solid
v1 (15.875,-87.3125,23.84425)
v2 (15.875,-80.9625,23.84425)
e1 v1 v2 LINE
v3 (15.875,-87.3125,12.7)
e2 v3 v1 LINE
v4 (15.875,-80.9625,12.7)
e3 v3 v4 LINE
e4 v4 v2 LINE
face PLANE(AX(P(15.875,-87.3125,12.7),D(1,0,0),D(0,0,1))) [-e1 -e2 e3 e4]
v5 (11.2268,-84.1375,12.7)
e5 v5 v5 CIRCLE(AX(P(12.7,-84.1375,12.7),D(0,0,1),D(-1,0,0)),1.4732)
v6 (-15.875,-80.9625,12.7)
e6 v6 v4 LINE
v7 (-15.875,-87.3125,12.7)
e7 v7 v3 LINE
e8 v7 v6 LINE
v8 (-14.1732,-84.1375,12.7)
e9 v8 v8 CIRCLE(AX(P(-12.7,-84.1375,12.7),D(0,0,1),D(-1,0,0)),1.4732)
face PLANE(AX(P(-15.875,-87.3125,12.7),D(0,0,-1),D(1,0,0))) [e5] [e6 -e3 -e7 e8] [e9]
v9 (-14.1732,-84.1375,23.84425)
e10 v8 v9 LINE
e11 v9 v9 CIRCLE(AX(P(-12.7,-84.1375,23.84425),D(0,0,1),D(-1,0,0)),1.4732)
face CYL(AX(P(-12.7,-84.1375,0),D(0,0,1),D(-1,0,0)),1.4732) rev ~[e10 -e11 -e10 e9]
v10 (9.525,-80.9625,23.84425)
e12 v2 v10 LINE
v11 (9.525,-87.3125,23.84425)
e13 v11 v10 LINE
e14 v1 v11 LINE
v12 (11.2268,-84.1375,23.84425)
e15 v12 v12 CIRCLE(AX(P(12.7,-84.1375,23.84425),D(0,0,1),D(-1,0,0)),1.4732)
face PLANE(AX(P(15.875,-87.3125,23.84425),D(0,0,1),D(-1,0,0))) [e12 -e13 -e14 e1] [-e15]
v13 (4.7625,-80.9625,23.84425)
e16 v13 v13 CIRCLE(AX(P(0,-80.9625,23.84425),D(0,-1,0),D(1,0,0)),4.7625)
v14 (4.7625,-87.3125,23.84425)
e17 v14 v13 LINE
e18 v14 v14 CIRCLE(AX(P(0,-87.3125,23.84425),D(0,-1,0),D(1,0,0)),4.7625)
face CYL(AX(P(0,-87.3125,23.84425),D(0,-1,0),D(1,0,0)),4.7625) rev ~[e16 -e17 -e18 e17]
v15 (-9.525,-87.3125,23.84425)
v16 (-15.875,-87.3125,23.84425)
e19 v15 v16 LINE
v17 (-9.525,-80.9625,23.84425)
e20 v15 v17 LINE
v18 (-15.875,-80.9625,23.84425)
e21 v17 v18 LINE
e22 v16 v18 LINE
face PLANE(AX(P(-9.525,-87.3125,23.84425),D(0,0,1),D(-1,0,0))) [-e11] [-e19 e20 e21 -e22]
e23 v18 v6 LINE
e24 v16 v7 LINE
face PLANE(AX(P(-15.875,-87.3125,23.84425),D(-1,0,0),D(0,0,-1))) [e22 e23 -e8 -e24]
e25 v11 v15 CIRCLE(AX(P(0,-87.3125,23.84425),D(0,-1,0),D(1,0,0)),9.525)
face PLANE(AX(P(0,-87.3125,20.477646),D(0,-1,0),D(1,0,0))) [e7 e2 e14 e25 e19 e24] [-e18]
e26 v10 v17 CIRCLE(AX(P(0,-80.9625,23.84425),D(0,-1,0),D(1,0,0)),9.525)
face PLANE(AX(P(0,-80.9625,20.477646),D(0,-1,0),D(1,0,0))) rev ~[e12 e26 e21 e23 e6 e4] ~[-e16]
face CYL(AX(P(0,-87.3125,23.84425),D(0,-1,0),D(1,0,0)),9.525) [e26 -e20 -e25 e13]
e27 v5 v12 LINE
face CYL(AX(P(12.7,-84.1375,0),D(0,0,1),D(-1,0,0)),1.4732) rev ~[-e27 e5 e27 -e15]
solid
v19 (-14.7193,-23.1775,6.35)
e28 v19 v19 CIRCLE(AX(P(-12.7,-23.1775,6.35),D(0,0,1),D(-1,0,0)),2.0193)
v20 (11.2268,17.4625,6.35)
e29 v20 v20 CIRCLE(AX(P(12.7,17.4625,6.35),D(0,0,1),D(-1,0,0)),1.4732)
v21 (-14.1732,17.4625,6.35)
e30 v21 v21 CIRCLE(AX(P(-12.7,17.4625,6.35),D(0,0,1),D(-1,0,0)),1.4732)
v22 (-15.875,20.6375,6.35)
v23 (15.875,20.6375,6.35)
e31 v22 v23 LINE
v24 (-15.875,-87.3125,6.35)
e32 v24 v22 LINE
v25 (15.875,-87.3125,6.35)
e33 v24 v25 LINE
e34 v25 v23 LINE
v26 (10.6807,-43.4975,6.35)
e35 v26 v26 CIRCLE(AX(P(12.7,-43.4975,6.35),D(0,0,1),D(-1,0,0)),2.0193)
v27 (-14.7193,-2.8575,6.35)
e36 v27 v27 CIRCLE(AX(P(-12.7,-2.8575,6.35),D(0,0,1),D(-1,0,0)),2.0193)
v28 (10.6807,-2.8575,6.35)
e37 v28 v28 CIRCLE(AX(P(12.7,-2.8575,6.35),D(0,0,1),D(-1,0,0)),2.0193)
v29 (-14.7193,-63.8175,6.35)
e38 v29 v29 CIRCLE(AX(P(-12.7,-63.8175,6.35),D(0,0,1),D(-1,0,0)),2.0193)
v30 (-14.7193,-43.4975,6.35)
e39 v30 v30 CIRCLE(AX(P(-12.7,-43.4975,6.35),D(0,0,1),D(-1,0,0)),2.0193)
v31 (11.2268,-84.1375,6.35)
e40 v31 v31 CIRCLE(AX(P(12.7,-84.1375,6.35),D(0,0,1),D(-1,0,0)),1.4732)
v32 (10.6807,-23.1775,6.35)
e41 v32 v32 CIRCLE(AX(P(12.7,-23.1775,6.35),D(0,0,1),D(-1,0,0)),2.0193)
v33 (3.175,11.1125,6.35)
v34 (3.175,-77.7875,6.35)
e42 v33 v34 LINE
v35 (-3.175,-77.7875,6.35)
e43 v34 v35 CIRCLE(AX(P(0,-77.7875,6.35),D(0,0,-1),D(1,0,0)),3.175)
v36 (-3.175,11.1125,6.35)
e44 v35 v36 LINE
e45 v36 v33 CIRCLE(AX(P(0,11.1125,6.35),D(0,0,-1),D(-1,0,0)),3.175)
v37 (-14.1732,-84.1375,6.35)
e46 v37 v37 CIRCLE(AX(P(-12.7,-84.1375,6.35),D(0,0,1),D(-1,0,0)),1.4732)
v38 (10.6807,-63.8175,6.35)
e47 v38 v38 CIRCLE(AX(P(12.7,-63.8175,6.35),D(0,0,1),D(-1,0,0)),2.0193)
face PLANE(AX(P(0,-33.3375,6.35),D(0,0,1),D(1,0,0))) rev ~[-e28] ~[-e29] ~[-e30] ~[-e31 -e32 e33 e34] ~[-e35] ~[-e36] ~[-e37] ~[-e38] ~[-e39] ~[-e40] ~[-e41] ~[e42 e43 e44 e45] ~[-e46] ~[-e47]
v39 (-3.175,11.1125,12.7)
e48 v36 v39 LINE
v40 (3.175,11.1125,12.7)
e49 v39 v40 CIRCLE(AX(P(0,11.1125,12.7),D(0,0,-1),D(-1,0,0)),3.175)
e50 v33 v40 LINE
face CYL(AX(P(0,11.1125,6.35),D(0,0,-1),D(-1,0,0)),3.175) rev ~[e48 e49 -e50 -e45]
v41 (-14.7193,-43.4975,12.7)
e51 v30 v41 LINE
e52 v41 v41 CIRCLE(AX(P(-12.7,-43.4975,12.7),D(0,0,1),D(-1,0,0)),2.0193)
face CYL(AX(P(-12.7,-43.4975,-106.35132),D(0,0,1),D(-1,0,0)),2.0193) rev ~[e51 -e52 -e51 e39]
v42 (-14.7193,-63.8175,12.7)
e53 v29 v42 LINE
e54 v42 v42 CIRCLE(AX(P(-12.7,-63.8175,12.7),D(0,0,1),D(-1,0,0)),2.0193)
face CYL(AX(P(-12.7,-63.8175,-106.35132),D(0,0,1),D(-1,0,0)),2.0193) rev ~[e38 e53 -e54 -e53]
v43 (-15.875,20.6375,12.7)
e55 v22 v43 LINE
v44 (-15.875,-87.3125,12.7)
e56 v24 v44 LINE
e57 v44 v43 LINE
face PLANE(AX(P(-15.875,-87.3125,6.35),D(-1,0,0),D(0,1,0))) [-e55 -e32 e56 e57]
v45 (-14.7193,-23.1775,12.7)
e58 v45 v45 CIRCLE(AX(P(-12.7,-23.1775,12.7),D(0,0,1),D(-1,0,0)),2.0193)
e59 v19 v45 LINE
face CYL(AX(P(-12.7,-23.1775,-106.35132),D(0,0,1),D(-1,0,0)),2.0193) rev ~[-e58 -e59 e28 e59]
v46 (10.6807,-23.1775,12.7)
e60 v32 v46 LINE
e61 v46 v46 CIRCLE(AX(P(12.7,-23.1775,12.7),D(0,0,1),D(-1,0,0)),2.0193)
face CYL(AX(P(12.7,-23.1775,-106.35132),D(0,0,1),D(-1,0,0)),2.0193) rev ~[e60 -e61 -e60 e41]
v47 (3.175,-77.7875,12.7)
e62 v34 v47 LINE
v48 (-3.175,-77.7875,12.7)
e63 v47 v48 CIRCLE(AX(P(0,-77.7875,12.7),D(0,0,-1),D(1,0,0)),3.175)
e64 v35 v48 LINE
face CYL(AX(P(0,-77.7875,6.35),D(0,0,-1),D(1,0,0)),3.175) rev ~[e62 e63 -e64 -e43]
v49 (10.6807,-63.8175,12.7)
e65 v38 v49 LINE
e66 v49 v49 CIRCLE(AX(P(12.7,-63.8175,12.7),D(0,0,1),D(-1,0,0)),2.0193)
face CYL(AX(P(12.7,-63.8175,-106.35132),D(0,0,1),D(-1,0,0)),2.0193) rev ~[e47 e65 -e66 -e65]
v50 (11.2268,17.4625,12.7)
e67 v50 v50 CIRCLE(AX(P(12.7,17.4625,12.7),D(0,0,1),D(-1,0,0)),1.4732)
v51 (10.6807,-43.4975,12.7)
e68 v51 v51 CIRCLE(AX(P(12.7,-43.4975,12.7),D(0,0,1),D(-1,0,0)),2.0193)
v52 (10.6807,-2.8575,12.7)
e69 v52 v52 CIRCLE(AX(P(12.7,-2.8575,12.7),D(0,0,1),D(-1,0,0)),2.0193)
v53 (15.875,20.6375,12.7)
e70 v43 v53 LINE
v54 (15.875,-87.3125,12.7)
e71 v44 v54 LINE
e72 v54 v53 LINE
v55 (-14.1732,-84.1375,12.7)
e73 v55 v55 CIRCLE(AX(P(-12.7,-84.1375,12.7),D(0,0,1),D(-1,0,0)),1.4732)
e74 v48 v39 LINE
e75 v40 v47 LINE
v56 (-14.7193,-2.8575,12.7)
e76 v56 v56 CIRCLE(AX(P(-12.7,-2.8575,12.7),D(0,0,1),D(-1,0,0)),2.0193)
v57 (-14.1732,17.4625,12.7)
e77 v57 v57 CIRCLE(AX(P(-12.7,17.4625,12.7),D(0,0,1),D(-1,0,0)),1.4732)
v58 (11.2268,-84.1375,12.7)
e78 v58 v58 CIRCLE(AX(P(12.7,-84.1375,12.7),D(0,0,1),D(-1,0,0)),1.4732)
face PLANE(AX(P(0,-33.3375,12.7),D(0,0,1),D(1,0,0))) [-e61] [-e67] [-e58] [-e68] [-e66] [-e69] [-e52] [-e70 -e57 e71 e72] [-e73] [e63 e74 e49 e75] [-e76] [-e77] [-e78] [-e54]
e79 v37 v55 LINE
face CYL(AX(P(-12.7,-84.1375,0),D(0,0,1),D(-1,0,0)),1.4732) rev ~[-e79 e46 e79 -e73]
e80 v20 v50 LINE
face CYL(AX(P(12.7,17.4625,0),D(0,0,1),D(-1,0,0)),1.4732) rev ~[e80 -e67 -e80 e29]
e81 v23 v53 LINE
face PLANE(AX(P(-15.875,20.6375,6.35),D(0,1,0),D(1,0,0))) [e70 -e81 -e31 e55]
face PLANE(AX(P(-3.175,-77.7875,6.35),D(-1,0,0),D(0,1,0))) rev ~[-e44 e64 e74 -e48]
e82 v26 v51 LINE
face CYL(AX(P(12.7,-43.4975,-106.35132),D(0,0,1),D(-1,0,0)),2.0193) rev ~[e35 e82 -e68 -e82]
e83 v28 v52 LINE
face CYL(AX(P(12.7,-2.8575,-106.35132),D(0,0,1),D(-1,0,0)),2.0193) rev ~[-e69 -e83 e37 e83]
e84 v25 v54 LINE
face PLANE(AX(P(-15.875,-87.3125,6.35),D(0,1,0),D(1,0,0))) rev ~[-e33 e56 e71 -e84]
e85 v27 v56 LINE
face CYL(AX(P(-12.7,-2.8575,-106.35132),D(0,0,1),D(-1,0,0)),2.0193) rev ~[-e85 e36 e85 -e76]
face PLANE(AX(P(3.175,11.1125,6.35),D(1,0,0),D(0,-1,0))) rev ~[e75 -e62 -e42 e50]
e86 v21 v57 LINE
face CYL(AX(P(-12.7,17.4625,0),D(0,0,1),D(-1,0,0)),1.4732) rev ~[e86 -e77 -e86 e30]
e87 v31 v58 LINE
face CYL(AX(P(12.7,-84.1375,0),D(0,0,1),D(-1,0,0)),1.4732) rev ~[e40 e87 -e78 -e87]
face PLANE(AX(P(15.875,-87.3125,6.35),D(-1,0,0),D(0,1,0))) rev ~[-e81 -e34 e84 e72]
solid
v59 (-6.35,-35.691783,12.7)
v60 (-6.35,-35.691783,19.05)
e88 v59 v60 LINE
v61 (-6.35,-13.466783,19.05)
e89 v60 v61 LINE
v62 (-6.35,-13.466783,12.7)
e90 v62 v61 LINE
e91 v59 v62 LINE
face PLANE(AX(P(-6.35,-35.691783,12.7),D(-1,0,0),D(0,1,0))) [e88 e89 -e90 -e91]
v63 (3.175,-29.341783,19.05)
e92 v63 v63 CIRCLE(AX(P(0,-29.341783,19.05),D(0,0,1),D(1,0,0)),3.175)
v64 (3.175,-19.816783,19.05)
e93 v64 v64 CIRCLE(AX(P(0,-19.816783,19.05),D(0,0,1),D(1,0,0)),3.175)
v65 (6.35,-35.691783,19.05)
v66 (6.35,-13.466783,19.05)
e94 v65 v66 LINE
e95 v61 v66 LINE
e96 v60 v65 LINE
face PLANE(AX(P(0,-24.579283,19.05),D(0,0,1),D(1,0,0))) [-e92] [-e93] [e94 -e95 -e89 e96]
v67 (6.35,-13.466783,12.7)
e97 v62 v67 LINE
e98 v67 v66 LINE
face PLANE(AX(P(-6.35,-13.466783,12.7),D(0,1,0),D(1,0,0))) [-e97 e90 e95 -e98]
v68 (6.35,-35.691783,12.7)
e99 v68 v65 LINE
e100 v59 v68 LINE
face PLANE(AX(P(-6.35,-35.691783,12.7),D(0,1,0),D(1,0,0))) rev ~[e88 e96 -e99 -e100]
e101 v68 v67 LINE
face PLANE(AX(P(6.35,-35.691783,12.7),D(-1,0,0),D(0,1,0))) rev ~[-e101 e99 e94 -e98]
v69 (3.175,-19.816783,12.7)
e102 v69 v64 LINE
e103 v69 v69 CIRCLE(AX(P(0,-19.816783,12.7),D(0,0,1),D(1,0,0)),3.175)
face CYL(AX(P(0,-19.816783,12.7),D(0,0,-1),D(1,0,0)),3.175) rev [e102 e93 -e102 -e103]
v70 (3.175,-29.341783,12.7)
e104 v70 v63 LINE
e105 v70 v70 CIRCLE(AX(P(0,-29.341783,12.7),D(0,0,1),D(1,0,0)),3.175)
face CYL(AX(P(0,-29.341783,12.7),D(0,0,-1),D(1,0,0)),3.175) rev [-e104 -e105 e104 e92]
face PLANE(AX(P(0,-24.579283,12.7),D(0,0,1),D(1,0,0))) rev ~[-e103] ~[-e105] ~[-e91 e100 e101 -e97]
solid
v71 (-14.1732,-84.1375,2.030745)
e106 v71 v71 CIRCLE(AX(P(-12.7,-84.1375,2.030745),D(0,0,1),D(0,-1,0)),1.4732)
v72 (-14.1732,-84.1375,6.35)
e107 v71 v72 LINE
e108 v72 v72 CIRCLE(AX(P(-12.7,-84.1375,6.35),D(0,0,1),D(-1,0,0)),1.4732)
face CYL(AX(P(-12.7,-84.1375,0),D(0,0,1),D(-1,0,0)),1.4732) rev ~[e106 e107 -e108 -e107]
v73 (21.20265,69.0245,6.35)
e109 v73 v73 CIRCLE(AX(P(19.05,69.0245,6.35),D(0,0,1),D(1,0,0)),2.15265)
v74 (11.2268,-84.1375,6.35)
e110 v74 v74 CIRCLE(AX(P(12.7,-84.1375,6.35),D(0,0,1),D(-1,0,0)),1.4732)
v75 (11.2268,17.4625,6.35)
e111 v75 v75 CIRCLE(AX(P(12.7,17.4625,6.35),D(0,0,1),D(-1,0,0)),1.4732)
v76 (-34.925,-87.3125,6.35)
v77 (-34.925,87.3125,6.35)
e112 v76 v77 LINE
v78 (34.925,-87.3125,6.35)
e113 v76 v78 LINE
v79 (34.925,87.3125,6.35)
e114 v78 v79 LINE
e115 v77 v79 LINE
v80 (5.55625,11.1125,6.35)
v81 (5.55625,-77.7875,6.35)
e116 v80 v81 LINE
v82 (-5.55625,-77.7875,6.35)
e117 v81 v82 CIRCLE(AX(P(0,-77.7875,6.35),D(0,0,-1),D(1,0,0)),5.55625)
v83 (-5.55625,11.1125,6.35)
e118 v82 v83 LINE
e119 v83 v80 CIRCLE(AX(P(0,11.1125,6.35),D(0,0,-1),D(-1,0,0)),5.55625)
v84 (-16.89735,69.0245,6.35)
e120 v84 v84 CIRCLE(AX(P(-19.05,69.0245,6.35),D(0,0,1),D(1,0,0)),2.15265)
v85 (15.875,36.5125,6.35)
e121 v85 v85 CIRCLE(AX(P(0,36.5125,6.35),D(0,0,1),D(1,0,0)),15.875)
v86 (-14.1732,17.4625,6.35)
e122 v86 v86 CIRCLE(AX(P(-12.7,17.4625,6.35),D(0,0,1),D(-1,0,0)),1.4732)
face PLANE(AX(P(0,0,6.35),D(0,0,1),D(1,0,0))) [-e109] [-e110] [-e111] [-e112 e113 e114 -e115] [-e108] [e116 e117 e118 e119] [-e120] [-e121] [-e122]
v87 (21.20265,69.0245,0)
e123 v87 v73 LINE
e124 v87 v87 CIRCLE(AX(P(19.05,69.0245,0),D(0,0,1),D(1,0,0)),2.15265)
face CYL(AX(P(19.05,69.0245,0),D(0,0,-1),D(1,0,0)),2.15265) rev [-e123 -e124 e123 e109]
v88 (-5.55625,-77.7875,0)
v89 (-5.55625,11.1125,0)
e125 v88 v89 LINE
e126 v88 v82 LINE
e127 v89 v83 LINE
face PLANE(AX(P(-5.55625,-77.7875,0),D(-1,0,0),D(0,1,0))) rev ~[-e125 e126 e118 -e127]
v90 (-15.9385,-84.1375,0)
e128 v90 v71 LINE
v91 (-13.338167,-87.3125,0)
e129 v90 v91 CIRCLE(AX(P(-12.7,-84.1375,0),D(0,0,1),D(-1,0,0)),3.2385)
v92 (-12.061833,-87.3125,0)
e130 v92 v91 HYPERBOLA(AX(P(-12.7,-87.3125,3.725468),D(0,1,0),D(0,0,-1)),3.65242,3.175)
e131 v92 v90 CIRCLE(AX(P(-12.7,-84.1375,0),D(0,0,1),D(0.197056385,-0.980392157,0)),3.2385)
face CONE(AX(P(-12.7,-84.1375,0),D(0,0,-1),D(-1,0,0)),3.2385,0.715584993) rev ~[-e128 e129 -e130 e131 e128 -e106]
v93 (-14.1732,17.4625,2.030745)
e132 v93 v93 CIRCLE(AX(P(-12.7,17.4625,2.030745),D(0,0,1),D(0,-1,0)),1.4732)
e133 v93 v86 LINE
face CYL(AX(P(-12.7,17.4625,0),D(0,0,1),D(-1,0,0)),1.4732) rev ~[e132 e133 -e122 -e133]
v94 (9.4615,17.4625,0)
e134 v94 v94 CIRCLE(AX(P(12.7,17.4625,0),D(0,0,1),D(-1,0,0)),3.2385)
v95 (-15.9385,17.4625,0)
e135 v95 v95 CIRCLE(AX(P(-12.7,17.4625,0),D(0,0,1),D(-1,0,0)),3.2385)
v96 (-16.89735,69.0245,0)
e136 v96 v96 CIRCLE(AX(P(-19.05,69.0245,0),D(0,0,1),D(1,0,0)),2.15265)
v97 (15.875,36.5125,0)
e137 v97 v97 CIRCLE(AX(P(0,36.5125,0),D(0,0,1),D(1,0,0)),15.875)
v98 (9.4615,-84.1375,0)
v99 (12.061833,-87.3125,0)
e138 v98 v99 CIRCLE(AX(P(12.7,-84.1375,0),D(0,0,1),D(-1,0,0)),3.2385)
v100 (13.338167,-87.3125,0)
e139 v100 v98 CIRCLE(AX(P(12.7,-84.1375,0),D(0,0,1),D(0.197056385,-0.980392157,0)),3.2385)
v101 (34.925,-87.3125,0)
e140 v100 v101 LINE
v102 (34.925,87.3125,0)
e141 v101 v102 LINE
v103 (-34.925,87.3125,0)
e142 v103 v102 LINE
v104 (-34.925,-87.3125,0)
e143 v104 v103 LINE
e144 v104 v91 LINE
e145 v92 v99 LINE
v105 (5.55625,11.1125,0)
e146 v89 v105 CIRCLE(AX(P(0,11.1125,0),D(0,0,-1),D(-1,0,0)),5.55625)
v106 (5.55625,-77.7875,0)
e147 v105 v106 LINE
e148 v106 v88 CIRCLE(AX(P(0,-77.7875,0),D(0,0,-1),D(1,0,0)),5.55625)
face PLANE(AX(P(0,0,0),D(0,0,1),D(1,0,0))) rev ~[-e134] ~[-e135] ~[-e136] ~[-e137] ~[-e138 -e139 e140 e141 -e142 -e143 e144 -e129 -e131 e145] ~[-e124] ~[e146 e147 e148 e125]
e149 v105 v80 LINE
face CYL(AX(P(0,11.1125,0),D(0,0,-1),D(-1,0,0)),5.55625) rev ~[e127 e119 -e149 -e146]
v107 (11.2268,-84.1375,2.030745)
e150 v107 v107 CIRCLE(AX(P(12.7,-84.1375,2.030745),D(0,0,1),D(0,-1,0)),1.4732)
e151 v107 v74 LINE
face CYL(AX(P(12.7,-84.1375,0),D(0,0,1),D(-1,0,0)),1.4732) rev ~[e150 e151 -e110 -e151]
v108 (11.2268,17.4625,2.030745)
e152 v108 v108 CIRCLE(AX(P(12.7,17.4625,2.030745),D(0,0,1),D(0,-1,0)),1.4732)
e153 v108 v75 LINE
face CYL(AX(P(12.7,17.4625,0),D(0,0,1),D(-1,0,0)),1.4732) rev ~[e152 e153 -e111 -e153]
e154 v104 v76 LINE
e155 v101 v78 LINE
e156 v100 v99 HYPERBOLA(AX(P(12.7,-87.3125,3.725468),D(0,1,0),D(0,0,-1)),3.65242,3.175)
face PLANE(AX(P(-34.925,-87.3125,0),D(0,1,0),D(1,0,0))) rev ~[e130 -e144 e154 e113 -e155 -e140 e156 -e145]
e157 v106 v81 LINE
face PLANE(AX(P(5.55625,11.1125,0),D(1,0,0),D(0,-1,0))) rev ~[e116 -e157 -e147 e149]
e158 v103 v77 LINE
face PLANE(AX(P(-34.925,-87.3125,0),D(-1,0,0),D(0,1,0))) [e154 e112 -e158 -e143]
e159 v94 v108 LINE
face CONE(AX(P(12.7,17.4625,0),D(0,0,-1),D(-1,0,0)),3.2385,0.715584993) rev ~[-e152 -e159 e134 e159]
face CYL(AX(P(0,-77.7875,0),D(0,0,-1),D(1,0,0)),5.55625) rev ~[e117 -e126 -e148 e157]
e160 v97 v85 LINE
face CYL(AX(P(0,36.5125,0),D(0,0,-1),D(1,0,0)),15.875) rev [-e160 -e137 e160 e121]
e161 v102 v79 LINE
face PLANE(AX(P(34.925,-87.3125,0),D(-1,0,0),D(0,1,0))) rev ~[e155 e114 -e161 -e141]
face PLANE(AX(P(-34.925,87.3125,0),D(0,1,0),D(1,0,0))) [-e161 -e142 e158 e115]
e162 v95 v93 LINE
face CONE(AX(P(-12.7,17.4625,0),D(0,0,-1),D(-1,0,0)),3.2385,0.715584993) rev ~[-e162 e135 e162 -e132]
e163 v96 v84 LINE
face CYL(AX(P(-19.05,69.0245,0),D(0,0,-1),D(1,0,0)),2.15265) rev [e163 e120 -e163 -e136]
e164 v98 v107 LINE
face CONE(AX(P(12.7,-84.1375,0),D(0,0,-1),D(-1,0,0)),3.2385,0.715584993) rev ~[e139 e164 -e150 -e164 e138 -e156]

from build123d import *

# Parameters (mm, degrees)
F2_W             = 69.85
F2_H             = 174.625
F2_R             = 2.15265
F2_R_2           = 15.875
F3_DEPTH         = 6.35
F4_W             = 31.75
F4_H             = 107.95
F5_DEPTH         = 6.35
F6_D             = 4.0386
F7_R             = 4.7625
F8_DEPTH         = 6.35
F9_D             = 2.9464
F9_CSINK_D       = 6.477
F9_CSINK_ANGLE   = 82
F9_2_D           = 2.9464
F9_2_CSINK_D     = 6.477
F9_2_CSINK_ANGLE = 82
F9_3_D           = 2.9464
F9_3_CSINK_D     = 6.477
F9_3_CSINK_ANGLE = 82
F10_W            = 12.7
F10_H            = 22.225
F10_R            = 3.175
F11_DEPTH        = 6.35


# Not quite as in the source:
# - a variable given as a bare number and used for a length is read in inches; the dataset says mm whatever the document's units were


with BuildPart() as f3:
    # F2 (on Top) → F3 (new body)
    with BuildSketch(Plane.XY):
        Rectangle(F2_W, F2_H)
        with BuildLine():
            ThreePointArc((-5.55625, 11.1125), (0, 16.66875), (5.55625, 11.1125))
            Line((5.55625, 11.1125), (5.55625, -77.7875))
            ThreePointArc((5.55625, -77.7875), (0, -83.34375), (-5.55625, -77.7875))
            Line((-5.55625, -77.7875), (-5.55625, 11.1125))
        make_face(mode=Mode.SUBTRACT)
        with Locations((-19.05, 69.0245)):
            Circle(F2_R, mode=Mode.SUBTRACT)
        with Locations((0, 36.5125)):
            Circle(F2_R_2, mode=Mode.SUBTRACT)
        with Locations((19.05, 69.0245)):
            Circle(F2_R, mode=Mode.SUBTRACT)
    extrude(amount=F3_DEPTH)

    # F9 (through all)
    with Locations(Plane(origin=(0, 0, 0), x_dir=(1, 0, 0), z_dir=(0, 0, -1))):
        with Locations((12.7, 84.1375), (-12.7, 84.1375), (-12.7, -17.4625), (12.7, -17.4625)):
            CounterSinkHole(F9_D / 2, F9_CSINK_D / 2, counter_sink_angle=F9_CSINK_ANGLE)


with BuildPart() as f5:
    # F4 (on face) → F5 (new body)
    with BuildSketch(Plane.XY.offset(6.35)):
        with Locations((0, -33.3375)):
            Rectangle(F4_W, F4_H)
        with BuildLine():
            ThreePointArc((-3.175, 11.1125), (0, 14.2875), (3.175, 11.1125))
            Line((3.175, 11.1125), (3.175, -77.7875))
            ThreePointArc((3.175, -77.7875), (0, -80.9625), (-3.175, -77.7875))
            Line((-3.175, -77.7875), (-3.175, 11.1125))
        make_face(mode=Mode.SUBTRACT)
    extrude(amount=F5_DEPTH)

    # F6 (through all)
    with Locations(Plane(origin=(0, 0, 6.35), x_dir=(1, 0, 0), z_dir=(0, 0, -1))):
        with Locations((-12.7, 63.8175), (-12.7, 43.4975), (-12.7, 23.1775), (-12.7, 2.8575), (12.7, 2.8575), (12.7, 23.1775), (12.7, 43.4975), (12.7, 63.8175)):
            Hole(F6_D / 2)

    # F9#2 (through all)
    with Locations(Plane(origin=(0, 0, 0), x_dir=(1, 0, 0), z_dir=(0, 0, -1))):
        with Locations((12.7, 84.1375), (-12.7, 84.1375), (-12.7, -17.4625), (12.7, -17.4625)):
            CounterSinkHole(F9_2_D / 2, F9_2_CSINK_D / 2, counter_sink_angle=F9_2_CSINK_ANGLE)


with BuildPart() as f8:
    # F7 (on face) → F8 (new body)
    with BuildSketch(Plane.XZ.offset(87.3125)):
        with BuildLine():
            Line((-15.875, 23.84425), (-15.875, 12.7))
            Line((-15.875, 12.7), (15.875, 12.7))
            Line((15.875, 12.7), (15.875, 23.84425))
            Line((15.875, 23.84425), (9.525, 23.84425))
            ThreePointArc((9.525, 23.84425), (0, 33.36925), (-9.525, 23.84425))
            Line((-9.525, 23.84425), (-15.875, 23.84425))
        make_face()
        with Locations((0, 23.84425)):
            Circle(F7_R, mode=Mode.SUBTRACT)
    extrude(amount=-F8_DEPTH)

    # F9#3 (through all)
    with Locations(Plane(origin=(0, 0, 0), x_dir=(1, 0, 0), z_dir=(0, 0, -1))):
        with Locations((12.7, 84.1375), (-12.7, 84.1375), (-12.7, -17.4625), (12.7, -17.4625)):
            CounterSinkHole(F9_3_D / 2, F9_3_CSINK_D / 2, counter_sink_angle=F9_3_CSINK_ANGLE)


with BuildPart() as f11:
    # F10 (on face) → F11 (new body)
    with BuildSketch(Plane.XY.offset(12.7)):
        with Locations((0, -24.5792828321)):
            Rectangle(F10_W, F10_H)
        with Locations((0, -29.3417828321)):
            Circle(F10_R, mode=Mode.SUBTRACT)
        with Locations((0, -19.8167828321)):
            Circle(F10_R, mode=Mode.SUBTRACT)
    extrude(amount=F11_DEPTH)


solid = Compound([f3.part, f5.part, f8.part, f11.part])
